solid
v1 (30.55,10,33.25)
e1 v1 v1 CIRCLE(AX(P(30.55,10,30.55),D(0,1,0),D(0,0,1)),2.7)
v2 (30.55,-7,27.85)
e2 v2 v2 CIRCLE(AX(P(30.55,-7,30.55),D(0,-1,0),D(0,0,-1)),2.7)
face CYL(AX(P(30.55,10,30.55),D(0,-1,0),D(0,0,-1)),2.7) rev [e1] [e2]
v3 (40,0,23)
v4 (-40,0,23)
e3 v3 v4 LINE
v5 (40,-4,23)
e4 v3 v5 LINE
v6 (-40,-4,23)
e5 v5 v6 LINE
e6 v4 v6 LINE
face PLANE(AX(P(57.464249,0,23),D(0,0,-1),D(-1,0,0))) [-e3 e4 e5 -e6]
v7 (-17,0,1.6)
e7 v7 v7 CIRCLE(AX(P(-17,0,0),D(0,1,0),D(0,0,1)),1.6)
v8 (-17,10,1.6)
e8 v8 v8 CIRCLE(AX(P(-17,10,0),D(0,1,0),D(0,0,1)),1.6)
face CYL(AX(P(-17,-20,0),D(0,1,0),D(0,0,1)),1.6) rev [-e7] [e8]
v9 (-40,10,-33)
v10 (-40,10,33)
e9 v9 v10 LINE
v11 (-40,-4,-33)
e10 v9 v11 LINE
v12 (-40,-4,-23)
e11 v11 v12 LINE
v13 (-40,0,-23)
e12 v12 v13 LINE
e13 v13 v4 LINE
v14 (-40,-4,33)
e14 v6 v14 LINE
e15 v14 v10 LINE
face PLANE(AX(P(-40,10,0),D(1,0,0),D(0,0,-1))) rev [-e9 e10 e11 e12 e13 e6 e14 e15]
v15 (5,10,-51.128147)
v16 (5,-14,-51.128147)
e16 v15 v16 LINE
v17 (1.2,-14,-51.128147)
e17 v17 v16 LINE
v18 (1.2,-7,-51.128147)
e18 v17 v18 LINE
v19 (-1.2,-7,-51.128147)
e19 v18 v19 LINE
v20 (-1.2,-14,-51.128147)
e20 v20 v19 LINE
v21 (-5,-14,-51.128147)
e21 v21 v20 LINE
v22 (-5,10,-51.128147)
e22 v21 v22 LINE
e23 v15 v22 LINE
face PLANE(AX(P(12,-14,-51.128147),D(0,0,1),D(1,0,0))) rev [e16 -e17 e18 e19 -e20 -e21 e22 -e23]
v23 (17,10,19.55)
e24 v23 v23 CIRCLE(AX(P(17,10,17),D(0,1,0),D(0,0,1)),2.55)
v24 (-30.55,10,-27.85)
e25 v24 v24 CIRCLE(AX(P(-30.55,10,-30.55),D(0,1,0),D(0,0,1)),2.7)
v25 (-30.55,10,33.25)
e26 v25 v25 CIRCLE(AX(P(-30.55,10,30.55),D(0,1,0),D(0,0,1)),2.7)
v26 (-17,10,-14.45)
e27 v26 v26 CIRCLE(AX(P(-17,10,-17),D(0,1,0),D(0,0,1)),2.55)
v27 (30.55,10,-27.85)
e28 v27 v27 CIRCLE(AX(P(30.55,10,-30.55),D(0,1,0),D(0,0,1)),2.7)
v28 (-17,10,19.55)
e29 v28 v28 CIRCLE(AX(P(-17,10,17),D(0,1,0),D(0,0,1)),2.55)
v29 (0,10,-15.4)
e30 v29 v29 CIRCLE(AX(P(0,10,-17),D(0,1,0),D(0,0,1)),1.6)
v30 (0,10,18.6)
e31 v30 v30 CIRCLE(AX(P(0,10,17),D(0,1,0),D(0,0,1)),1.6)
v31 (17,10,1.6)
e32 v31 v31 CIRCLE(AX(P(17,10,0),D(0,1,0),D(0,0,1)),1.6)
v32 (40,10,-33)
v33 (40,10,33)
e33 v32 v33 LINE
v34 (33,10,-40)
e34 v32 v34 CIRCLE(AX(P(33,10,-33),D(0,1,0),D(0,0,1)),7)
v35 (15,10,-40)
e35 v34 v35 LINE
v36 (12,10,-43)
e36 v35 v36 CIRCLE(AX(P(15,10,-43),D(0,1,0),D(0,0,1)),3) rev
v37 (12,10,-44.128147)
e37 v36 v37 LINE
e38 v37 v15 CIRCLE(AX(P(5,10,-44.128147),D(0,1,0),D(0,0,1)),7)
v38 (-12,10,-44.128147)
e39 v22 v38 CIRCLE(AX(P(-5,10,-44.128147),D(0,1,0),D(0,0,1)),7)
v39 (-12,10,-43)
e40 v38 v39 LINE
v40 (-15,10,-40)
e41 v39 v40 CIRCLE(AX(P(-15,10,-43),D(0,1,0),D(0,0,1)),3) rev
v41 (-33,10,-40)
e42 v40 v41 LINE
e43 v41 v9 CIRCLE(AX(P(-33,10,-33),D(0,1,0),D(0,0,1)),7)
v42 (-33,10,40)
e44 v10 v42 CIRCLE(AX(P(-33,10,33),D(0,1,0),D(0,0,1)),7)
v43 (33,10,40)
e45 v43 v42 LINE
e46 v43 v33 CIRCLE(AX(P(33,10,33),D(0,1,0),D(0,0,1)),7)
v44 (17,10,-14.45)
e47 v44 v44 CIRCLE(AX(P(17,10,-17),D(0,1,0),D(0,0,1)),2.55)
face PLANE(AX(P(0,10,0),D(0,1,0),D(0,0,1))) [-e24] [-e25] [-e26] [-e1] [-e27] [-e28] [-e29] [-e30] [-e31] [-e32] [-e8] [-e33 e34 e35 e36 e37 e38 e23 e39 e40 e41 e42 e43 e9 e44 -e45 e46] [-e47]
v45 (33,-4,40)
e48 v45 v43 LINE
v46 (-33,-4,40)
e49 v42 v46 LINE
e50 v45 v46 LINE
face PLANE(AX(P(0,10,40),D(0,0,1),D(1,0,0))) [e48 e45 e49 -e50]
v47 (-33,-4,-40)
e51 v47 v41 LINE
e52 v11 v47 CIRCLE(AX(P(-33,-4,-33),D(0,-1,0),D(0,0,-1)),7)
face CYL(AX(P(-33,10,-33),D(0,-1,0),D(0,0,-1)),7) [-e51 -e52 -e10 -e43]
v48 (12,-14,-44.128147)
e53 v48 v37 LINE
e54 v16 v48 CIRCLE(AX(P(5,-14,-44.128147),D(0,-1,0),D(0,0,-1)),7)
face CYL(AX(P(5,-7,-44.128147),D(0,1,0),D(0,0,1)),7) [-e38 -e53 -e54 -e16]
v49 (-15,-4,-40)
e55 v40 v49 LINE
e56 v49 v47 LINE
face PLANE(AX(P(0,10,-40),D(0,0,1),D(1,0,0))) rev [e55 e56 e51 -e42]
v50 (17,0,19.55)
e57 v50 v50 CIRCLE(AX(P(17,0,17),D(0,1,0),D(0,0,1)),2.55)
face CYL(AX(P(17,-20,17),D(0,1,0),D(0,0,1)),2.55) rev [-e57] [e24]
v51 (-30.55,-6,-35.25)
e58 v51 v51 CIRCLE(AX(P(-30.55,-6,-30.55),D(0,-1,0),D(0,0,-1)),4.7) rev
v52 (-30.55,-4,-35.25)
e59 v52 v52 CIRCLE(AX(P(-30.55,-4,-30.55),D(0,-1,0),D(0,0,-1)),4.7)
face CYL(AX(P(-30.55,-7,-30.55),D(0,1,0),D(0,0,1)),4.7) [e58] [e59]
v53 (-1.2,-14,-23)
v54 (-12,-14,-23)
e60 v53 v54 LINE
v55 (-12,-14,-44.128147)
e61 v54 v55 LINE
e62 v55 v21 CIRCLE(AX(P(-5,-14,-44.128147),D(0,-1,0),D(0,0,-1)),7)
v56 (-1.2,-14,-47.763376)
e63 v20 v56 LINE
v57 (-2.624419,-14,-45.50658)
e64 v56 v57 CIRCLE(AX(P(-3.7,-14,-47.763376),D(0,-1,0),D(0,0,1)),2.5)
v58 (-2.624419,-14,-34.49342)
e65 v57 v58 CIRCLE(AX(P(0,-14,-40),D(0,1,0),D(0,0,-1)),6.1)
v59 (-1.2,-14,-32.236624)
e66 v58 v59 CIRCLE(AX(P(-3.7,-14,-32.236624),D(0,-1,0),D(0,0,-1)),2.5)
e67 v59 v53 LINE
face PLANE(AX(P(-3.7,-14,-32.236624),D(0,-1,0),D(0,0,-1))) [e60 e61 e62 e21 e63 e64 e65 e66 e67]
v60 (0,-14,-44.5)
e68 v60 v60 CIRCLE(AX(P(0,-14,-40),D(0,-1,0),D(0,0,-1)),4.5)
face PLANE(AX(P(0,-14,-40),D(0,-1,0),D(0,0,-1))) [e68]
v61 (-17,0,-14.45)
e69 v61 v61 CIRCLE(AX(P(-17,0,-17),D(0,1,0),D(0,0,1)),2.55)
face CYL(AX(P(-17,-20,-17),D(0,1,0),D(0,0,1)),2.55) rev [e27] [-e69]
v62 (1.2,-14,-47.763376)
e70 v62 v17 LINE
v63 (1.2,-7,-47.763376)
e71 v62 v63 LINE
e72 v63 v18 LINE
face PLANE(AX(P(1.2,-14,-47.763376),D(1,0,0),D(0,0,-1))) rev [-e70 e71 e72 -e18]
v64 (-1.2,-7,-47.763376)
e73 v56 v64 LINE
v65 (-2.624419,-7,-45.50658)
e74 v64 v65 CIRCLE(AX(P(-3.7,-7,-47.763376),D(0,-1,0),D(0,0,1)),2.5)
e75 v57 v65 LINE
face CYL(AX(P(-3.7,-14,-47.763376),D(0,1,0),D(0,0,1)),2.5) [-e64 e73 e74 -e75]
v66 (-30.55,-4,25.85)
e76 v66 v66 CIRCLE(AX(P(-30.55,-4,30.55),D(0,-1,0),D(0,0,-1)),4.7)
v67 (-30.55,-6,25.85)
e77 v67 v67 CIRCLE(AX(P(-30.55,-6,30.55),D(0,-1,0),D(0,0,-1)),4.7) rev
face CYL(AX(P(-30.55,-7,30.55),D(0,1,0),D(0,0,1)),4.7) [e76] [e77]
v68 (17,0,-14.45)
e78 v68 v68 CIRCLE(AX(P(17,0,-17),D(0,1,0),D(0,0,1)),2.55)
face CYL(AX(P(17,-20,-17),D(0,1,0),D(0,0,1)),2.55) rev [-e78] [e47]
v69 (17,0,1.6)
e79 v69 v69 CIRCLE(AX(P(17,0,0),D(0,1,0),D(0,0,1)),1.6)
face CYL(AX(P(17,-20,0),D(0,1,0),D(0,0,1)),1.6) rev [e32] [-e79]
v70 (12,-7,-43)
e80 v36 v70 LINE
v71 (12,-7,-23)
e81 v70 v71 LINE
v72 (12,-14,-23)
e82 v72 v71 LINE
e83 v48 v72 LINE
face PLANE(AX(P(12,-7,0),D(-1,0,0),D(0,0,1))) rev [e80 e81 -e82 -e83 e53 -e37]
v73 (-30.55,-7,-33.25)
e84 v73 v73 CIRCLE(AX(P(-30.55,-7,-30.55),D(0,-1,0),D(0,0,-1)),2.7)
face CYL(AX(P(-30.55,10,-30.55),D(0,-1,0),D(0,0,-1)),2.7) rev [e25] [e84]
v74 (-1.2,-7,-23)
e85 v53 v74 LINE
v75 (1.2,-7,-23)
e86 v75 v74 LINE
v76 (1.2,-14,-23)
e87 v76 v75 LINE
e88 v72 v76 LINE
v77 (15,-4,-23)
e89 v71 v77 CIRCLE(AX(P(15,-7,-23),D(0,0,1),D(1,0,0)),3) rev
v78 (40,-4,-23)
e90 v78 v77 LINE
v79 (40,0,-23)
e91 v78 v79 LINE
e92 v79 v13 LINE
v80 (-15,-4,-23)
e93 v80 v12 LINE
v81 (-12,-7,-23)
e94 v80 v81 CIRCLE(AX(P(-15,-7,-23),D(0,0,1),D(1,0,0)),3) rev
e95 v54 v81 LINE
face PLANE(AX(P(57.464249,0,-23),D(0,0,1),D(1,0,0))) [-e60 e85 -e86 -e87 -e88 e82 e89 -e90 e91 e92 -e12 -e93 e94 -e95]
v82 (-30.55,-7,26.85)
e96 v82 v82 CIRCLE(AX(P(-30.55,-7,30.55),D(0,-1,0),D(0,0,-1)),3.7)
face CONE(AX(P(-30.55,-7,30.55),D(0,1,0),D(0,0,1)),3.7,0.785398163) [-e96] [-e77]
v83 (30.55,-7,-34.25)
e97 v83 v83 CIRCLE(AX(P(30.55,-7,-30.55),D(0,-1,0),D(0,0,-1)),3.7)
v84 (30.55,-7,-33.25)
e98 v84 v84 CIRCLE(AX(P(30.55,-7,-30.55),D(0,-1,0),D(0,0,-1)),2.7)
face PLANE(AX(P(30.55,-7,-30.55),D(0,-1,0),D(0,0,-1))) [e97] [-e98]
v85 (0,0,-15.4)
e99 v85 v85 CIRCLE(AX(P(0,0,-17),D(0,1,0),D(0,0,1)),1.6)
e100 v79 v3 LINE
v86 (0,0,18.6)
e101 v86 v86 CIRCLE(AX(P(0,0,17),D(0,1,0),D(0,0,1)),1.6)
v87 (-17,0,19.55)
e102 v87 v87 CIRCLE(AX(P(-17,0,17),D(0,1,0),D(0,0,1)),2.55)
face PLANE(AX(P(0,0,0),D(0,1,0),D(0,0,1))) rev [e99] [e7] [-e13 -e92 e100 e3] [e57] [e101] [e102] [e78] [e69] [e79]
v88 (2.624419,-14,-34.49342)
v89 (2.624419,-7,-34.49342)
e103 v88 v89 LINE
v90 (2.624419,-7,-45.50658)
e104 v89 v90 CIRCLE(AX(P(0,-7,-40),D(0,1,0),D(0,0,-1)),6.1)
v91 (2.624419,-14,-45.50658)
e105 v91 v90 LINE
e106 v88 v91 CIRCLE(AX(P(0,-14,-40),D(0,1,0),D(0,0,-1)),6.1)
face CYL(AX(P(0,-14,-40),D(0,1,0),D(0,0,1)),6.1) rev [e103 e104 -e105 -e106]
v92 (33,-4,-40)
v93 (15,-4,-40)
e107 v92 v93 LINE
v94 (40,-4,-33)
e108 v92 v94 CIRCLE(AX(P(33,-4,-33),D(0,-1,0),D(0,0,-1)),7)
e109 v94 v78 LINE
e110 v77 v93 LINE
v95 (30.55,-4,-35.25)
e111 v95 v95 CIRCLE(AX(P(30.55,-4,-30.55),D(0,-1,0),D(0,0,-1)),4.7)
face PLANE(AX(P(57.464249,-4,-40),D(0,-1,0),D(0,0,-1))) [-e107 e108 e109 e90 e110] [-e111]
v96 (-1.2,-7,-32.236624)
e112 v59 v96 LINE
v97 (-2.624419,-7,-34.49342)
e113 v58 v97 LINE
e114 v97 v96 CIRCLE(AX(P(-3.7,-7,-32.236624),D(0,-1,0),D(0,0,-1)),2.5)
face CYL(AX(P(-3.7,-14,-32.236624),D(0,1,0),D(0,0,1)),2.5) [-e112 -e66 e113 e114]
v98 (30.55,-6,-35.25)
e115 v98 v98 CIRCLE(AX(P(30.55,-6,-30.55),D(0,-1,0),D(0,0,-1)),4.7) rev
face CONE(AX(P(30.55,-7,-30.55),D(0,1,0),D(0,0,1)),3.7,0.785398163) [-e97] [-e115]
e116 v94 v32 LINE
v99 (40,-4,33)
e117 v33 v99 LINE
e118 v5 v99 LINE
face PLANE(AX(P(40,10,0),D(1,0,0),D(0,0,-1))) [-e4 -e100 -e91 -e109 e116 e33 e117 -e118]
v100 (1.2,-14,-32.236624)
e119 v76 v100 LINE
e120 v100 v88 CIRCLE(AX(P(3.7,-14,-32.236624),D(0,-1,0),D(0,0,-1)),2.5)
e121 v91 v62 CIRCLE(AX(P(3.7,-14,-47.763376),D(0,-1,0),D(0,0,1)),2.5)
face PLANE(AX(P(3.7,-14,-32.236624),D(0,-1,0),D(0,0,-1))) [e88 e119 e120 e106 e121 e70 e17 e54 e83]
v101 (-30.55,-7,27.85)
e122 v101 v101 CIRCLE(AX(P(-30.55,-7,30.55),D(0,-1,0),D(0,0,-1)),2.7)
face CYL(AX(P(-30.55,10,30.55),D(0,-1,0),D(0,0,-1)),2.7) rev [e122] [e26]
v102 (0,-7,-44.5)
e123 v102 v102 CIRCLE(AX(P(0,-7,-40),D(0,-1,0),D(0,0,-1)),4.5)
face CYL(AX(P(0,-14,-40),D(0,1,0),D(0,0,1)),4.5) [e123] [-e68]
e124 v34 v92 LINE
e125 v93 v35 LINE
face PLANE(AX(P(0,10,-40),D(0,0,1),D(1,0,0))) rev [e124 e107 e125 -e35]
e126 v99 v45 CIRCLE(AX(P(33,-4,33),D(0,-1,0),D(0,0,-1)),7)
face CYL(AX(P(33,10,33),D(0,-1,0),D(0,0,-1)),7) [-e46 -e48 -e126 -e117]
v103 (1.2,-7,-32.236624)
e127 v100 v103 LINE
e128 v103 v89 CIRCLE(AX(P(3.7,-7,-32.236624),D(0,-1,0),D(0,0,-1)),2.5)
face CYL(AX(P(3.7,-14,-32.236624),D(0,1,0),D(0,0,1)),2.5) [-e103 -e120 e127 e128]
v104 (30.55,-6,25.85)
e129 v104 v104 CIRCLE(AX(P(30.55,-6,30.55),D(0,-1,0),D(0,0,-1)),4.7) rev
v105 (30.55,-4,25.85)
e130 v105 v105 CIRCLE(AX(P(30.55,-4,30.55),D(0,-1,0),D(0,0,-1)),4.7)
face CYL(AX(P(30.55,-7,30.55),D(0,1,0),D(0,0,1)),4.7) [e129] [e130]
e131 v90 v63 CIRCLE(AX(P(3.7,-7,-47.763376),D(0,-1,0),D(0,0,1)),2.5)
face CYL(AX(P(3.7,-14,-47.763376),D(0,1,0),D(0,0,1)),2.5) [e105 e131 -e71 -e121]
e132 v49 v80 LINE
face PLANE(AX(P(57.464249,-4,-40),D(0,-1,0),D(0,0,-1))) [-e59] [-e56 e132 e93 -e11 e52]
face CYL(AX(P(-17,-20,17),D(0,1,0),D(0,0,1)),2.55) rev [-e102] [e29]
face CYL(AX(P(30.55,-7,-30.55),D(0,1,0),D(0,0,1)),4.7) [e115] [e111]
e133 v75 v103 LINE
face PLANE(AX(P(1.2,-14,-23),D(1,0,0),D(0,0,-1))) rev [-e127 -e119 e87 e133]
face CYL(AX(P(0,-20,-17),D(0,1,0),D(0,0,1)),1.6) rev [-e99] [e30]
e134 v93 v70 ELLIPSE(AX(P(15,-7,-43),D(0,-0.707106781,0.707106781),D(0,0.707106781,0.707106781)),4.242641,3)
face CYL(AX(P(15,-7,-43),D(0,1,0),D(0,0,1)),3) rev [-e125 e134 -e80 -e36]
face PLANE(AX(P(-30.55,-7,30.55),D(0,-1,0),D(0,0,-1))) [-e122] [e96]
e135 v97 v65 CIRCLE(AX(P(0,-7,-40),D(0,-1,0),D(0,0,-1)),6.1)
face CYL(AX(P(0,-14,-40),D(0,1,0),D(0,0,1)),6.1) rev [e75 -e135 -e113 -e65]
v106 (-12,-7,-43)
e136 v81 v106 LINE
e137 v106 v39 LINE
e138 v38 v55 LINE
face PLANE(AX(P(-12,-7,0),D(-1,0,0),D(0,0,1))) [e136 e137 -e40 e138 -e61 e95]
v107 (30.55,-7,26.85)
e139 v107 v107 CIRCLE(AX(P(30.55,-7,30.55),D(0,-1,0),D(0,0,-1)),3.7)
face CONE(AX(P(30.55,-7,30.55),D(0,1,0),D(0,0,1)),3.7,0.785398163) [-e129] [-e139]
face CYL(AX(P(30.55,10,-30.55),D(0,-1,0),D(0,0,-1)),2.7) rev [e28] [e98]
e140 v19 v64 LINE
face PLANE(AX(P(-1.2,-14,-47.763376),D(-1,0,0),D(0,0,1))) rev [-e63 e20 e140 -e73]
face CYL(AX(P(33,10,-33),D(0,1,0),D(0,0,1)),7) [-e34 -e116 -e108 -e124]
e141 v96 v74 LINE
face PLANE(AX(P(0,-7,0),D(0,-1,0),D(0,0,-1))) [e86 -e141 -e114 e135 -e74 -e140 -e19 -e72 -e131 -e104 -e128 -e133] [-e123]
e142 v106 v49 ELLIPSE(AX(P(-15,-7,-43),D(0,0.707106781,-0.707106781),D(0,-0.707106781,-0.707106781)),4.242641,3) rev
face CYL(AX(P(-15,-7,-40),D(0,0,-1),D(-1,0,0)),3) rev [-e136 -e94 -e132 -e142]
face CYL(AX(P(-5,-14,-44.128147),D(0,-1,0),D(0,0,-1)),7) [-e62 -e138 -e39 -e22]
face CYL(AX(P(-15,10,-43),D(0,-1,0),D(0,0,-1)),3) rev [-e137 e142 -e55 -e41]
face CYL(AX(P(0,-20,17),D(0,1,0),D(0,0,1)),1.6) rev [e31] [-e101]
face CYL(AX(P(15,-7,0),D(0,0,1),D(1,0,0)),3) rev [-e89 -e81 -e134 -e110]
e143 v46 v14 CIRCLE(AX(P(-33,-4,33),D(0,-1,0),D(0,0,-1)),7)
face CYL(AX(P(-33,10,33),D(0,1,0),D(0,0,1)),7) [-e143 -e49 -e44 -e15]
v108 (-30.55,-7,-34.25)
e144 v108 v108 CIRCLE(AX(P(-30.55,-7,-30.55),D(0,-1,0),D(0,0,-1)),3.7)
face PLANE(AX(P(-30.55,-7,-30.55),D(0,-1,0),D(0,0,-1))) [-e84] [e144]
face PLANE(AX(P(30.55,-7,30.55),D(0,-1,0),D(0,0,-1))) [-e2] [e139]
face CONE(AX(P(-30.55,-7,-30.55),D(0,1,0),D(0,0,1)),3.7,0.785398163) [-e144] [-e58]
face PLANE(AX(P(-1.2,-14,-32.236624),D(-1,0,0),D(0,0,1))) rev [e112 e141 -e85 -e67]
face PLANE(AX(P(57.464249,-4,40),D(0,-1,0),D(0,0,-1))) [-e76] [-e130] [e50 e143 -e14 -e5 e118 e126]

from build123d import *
from build123d.topology import SkipClean

# Parameters (mm, degrees)
SKETCH1_R                       = 2.7
BOSS_EXTRUDE1_DEPTH             = 10
SKETCH3_W                       = 17
SKETCH3_H                       = 4
BOSS_EXTRUDE2_DEPTH             = 80
CUT_EXTRUDE1_START              = -36
SKETCH4_R                       = 2.7
CUT_EXTRUDE1_DEPTH              = 36
BOSS_EXTRUDE3_START             = 3
SKETCH5_R                       = 4.7
SKETCH5_R_2                     = 2.7
BOSS_EXTRUDE3_DEPTH             = 3
CHAMFER1_SIZE                   = 1
FILLET2_R                       = 7
SKETCH6_R                       = 12.5
CUT_EXTRUDE2_DEPTH              = 2
CHAMFER2_SIZE                   = 2
SKETCH7_R                       = 3.25
CUT_EXTRUDE3_DEPTH              = 19
SKETCH8_R                       = 32.55
CUT_EXTRUDE4_DEPTH              = 2
BOSS_EXTRUDE4_REACH             = 60.523
SKETCH9_R                       = 32.55
BOSS_EXTRUDE4_DIRECTION_2_REACH = 60.523
SKETCH10_W                      = 12
SKETCH10_H                      = 17
BOSS_EXTRUDE5_DEPTH             = 3
SKETCH11_R                      = 4.5
BOSS_EXTRUDE6_DEPTH             = 7
SKETCH12_W                      = 24
SKETCH12_H                      = 11.128147065
BOSS_EXTRUDE7_DEPTH             = 17
CUT_EXTRUDE5_DEPTH              = 30
FILLET3_R                       = 7
FILLET4_R                       = 3


with BuildPart() as part:
    # Sketch1 → Boss-Extrude1 (new body)
    with BuildSketch(Plane(origin=(0, 0, 0), x_dir=(1, 0, 0), z_dir=(0, 1, 0))):
        Polygon((40, 40), (0, 40), (-30.55, 40), (-40, 40), (-40, -40), (40, -40), (40, 0), align=None)
        with Locations(Location((-30.55, -30.55, 0), (0, 0, 270))):
            Circle(SKETCH1_R, mode=Mode.SUBTRACT)
        with Locations(Location((30.55, -30.55, 0), (0, 0, 270))):
            Circle(SKETCH1_R, mode=Mode.SUBTRACT)
        with Locations(Location((-30.55, 30.55, 0), (0, 0, 270))):
            Circle(SKETCH1_R, mode=Mode.SUBTRACT)
        with Locations(Location((30.55, 30.55, 0), (0, 0, 270))):
            Circle(SKETCH1_R, mode=Mode.SUBTRACT)
    extrude(amount=BOSS_EXTRUDE1_DEPTH)

    # Sketch3 → Boss-Extrude2 (add)
    with BuildSketch(Plane.ZY.offset(40)):
        with Locations((-31.5, -2)):
            Rectangle(SKETCH3_W, SKETCH3_H)
        with Locations((31.5, -2)):
            Rectangle(SKETCH3_W, SKETCH3_H)
    extrude(amount=-BOSS_EXTRUDE2_DEPTH)

    # Sketch4 → Cut-Extrude1 (cut)
    with BuildSketch(Plane(origin=(0, 10, 0), x_dir=(1, 0, 0), z_dir=(0, 1, 0)).offset(CUT_EXTRUDE1_START)):
        with Locations(Location((30.55, -30.55, 0), (0, 0, 90))):
            Circle(SKETCH4_R)
        with Locations(Location((-30.55, -30.55, 0), (0, 0, 90))):
            Circle(SKETCH4_R)
        with Locations(Location((-30.55, 30.55, 0), (0, 0, 90))):
            Circle(SKETCH4_R)
        with Locations(Location((30.55, 30.55, 0), (0, 0, 90))):
            Circle(SKETCH4_R)
    extrude(amount=CUT_EXTRUDE1_DEPTH, mode=Mode.SUBTRACT)

    # Sketch5 → Boss-Extrude3 (add)
    # profile 1 of 4: a face of its own
    with SkipClean():  # the faces are left unmerged after this step: merging them gives an invalid solid
        with BuildSketch(Plane.XZ.offset(4).offset(BOSS_EXTRUDE3_START)):
            with Locations(Location((-30.55, -30.55, 0), (0, 0, 270))):
                Circle(SKETCH5_R)
            with Locations(Location((-30.55, -30.55, 0), (0, 0, 270))):
                Circle(SKETCH5_R_2, mode=Mode.SUBTRACT)
        # profile 2 of 4: a face of its own
        with BuildSketch(Plane.XZ.offset(4).offset(BOSS_EXTRUDE3_START)):
            with Locations(Location((-30.55, 30.55, 0), (0, 0, 270))):
                Circle(SKETCH5_R)
            with Locations(Location((-30.55, 30.55, 0), (0, 0, 270))):
                Circle(SKETCH5_R_2, mode=Mode.SUBTRACT)
        # profile 3 of 4: a face of its own
        with BuildSketch(Plane.XZ.offset(4).offset(BOSS_EXTRUDE3_START)):
            with Locations(Location((30.55, 30.55, 0), (0, 0, 270))):
                Circle(SKETCH5_R)
            with Locations(Location((30.55, 30.55, 0), (0, 0, 270))):
                Circle(SKETCH5_R_2, mode=Mode.SUBTRACT)
        # profile 4 of 4: a face of its own
        with BuildSketch(Plane.XZ.offset(4).offset(BOSS_EXTRUDE3_START)):
            with Locations(Location((30.55, -30.55, 0), (0, 0, 270))):
                Circle(SKETCH5_R)
            with Locations(Location((30.55, -30.55, 0), (0, 0, 270))):
                Circle(SKETCH5_R_2, mode=Mode.SUBTRACT)
        extrude(amount=-BOSS_EXTRUDE3_DEPTH)

    # Chamfer1
    chamfer1_edges = [part.edges().sort_by_distance(p)[0] for p in [
        (-30.55, -7, -25.85),
        (-30.55, -7, 35.25),
        (30.55, -7, 35.25),
        (30.55, -7, -25.85),
    ]]
    chamfer(chamfer1_edges, length=CHAMFER1_SIZE)

    # Fillet2
    fillet2_edges = [part.edges().sort_by_distance(p)[0] for p in [
        (40, 3, -40),
        (40, 3, 40),
        (-40, 3, 40),
        (-40, 3, -40),
    ]]
    fillet(fillet2_edges, radius=FILLET2_R)

    # Sketch6 → Cut-Extrude2 (cut)
    with SkipClean():  # the faces are left unmerged after this step: merging them gives an invalid solid
        with BuildSketch(Plane.XZ):
            with Locations(Location((0, 0, 0), (0, 0, 270))):
                Circle(SKETCH6_R)
        extrude(amount=-CUT_EXTRUDE2_DEPTH, mode=Mode.SUBTRACT)

    # Chamfer2
    chamfer2_edges = [part.edges().sort_by_distance(p)[0] for p in [
        (0, 0, 12.5),
    ]]
    chamfer(chamfer2_edges, length=CHAMFER2_SIZE - 0.0001)  # a hair under: the kernel refuses the full size

    # Sketch7 → Cut-Extrude3 (cut)
    with BuildSketch(Plane.XZ.offset(-2)):
        with Locations(Location((0, 0, 0), (0, 0, 270))):
            Circle(SKETCH7_R)
    extrude(amount=-CUT_EXTRUDE3_DEPTH, mode=Mode.SUBTRACT)

    # Sketch8 → Cut-Extrude4 (cut)
    with BuildSketch(Plane(origin=(0, 10, 0), x_dir=(1, 0, 0), z_dir=(0, 1, 0))):
        with Locations(Location((0, 0, 0), (0, 0, 270))):
            Circle(SKETCH8_R)
    extrude(amount=-CUT_EXTRUDE4_DEPTH, mode=Mode.SUBTRACT)

    # Boss-Extrude4: up to this face of the body (flat: up to its plane)
    boss_extrude4_end = Plane(part.part.faces().sort_by_distance((0, 10, -38.86862915))[0])
    # Sketch9 → Boss-Extrude4 (add, up to the picked face)
    with BuildSketch(Plane(origin=(0, 8, 0), x_dir=(1, 0, 0), z_dir=(0, 1, 0)), mode=Mode.PRIVATE) as boss_extrude4_sk1:
        Circle(SKETCH9_R)
    boss_extrude4_tool1 = split(extrude(boss_extrude4_sk1.sketch, amount=BOSS_EXTRUDE4_REACH, mode=Mode.PRIVATE), bisect_by=boss_extrude4_end, keep=Keep.BOTH, mode=Mode.PRIVATE)
    add(boss_extrude4_tool1.solids().sort_by(Axis((0, 8, 0), (0, 1, 0)))[0])

    # Boss-Extrude4 direction 2: up to this face of the body (flat: up to its plane)
    boss_extrude4_direction_2_end = Plane(part.part.faces().sort_by_distance((0, 0, 15.42272176))[0])
    # Sketch9 → Boss-Extrude4 direction 2 (add, up to the picked face)
    with BuildSketch(Plane(origin=(0, 8, 0), x_dir=(1, 0, 0), z_dir=(0, 1, 0)), mode=Mode.PRIVATE) as boss_extrude4_direction_2_sk1:
        Circle(SKETCH9_R)
    boss_extrude4_direction_2_tool1 = split(extrude(boss_extrude4_direction_2_sk1.sketch, amount=-BOSS_EXTRUDE4_DIRECTION_2_REACH, mode=Mode.PRIVATE), bisect_by=boss_extrude4_direction_2_end, keep=Keep.BOTH, mode=Mode.PRIVATE)
    add(boss_extrude4_direction_2_tool1.solids().sort_by(Axis((0, 8, 0), (0, -1, 0)))[0])

    # Sketch10 → Boss-Extrude5 (add)
    with BuildSketch(Plane.XZ.offset(4)):
        with Locations((6, -31.5)):
            Rectangle(SKETCH10_W, SKETCH10_H)
        with Locations((-6, -31.5)):
            Rectangle(SKETCH10_W, SKETCH10_H)
    extrude(amount=BOSS_EXTRUDE5_DEPTH)

    # Sketch11 → Boss-Extrude6 (add)
    with BuildSketch(Plane.XZ.offset(7)):
        with Locations(Location((0, -40, 0), (0, 0, 180))):
            Circle(SKETCH11_R)
        with BuildLine():
            Line((9.874300694, -23), (1.2, -23))
            Line((1.2, -23), (1.2, -32.236624446))
            ThreePointArc((1.2, -32.236624446), (1.585886298, -33.570986936), (2.624418605, -34.493419665))
            ThreePointArc((2.624418605, -34.493419665), (6.1, -40), (2.624418605, -45.506580335))
            ThreePointArc((2.624418605, -45.506580335), (1.585886298, -46.429013064), (1.2, -47.763375554))
            Line((1.2, -47.763375554), (1.2, -51.128147065))
            Line((1.2, -51.128147065), (9.874300694, -51.128147065))
            Line((9.874300694, -51.128147065), (12, -51.128147065))
            Line((12, -51.128147065), (12, -23))
            Line((12, -23), (9.874300694, -23))
        make_face()
        with BuildLine():
            Line((-1.2, -32.236624446), (-1.2, -23))
            Line((-1.2, -23), (-9.908726598, -23))
            Line((-9.908726598, -23), (-12, -23))
            Line((-12, -23), (-12, -51.128147065))
            Line((-12, -51.128147065), (-9.908726598, -51.128147065))
            Line((-9.908726598, -51.128147065), (-1.2, -51.128147065))
            Line((-1.2, -51.128147065), (-1.2, -47.763375554))
            ThreePointArc((-1.2, -47.763375554), (-1.585886298, -46.429013064), (-2.624418605, -45.506580335))
            ThreePointArc((-2.624418605, -45.506580335), (-6.1, -40), (-2.624418605, -34.493419665))
            ThreePointArc((-2.624418605, -34.493419665), (-1.585886298, -33.570986936), (-1.2, -32.236624446))
        make_face()
    extrude(amount=BOSS_EXTRUDE6_DEPTH)

    # Sketch12 → Boss-Extrude7 (add)
    with BuildSketch(Plane(origin=(0, -7, 0), x_dir=(1, 0, 0), z_dir=(0, 1, 0))):
        with Locations((0, 45.564073533)):
            Rectangle(SKETCH12_W, SKETCH12_H)
    extrude(amount=BOSS_EXTRUDE7_DEPTH)

    # Sketch13 → Cut-Extrude5 (cut)
    with BuildSketch(Plane(origin=(0, 10, 0), x_dir=(1, 0, 0), z_dir=(0, 1, 0))):
        with BuildLine():
            Line((-14.45, 17), (-17, 17))
            Line((-17, 17), (-17, 14.45))
            ThreePointArc((-17, 14.45), (-15.196877708, 15.196877708), (-14.45, 17))
        make_face()
        with BuildLine():
            Line((-17, 14.45), (-17, 17))
            Line((-17, 17), (-14.45, 17))
            ThreePointArc((-14.45, 17), (-18.803122292, 18.803122292), (-17, 14.45))
        make_face()
        with BuildLine():
            ThreePointArc((1.6, 17), (0, 18.6), (-1.6, 17))
            Line((-1.6, 17), (1.6, 17))
        make_face()
        with BuildLine():
            Line((1.6, 17), (-1.6, 17))
            ThreePointArc((-1.6, 17), (0, 15.4), (1.6, 17))
        make_face()
        with BuildLine():
            ThreePointArc((19.55, 17), (17, 19.55), (14.45, 17))
            Line((14.45, 17), (17, 17))
            Line((17, 17), (17, 14.45))
            ThreePointArc((17, 14.45), (18.803122292, 15.196877708), (19.55, 17))
        make_face()
        with BuildLine():
            Line((17, 17), (14.45, 17))
            ThreePointArc((14.45, 17), (15.196877708, 15.196877708), (17, 14.45))
            Line((17, 14.45), (17, 17))
        make_face()
        with BuildLine():
            ThreePointArc((18.6, 0), (18.13137085, 1.13137085), (17, 1.6))
            Line((17, 1.6), (17, -1.6))
            ThreePointArc((17, -1.6), (18.13137085, -1.13137085), (18.6, 0))
        make_face()
        with BuildLine():
            Line((17, -1.6), (17, 1.6))
            ThreePointArc((17, 1.6), (15.4, 0), (17, -1.6))
        make_face()
        with BuildLine():
            ThreePointArc((17, -14.45), (15.196877708, -15.196877708), (14.45, -17))
            Line((14.45, -17), (17, -17))
            Line((17, -17), (17, -14.45))
        make_face()
        with BuildLine():
            Line((17, -17), (14.45, -17))
            ThreePointArc((14.45, -17), (17, -19.55), (19.55, -17))
            ThreePointArc((19.55, -17), (18.803122292, -15.196877708), (17, -14.45))
            Line((17, -14.45), (17, -17))
        make_face()
        with BuildLine():
            ThreePointArc((1.6, -17), (0, -15.4), (-1.6, -17))
            Line((-1.6, -17), (1.6, -17))
        make_face()
        with BuildLine():
            Line((1.6, -17), (-1.6, -17))
            ThreePointArc((-1.6, -17), (0, -18.6), (1.6, -17))
        make_face()
        with BuildLine():
            ThreePointArc((-14.45, -17), (-15.196877708, -15.196877708), (-17, -14.45))
            Line((-17, -14.45), (-17, -17))
            Line((-17, -17), (-14.45, -17))
        make_face()
        with BuildLine():
            Line((-17, -17), (-17, -14.45))
            ThreePointArc((-17, -14.45), (-18.803122292, -18.803122292), (-14.45, -17))
            Line((-14.45, -17), (-17, -17))
        make_face()
        with BuildLine():
            ThreePointArc((-15.4, 0), (-15.86862915, 1.13137085), (-17, 1.6))
            Line((-17, 1.6), (-17, -1.6))
            ThreePointArc((-17, -1.6), (-15.86862915, -1.13137085), (-15.4, 0))
        make_face()
        with BuildLine():
            Line((-17, -1.6), (-17, 1.6))
            ThreePointArc((-17, 1.6), (-18.6, 0), (-17, -1.6))
        make_face()
    extrude(amount=-CUT_EXTRUDE5_DEPTH, mode=Mode.SUBTRACT)

    # Fillet3
    fillet3_edges = [part.edges().sort_by_distance(p)[0] for p in [
        (12, -2, -51.128147065),
        (-12, -2, -51.128147065),
    ]]
    fillet(fillet3_edges, radius=FILLET3_R)

    # Fillet4
    fillet4_edges = [part.edges().sort_by_distance(p)[0] for p in [
        (12, -4, -31.5),
        (-12, -4, -31.5),
        (-12, 3, -40),
        (12, 3, -40),
    ]]
    fillet(fillet4_edges, radius=FILLET4_R)


solid = part.part
